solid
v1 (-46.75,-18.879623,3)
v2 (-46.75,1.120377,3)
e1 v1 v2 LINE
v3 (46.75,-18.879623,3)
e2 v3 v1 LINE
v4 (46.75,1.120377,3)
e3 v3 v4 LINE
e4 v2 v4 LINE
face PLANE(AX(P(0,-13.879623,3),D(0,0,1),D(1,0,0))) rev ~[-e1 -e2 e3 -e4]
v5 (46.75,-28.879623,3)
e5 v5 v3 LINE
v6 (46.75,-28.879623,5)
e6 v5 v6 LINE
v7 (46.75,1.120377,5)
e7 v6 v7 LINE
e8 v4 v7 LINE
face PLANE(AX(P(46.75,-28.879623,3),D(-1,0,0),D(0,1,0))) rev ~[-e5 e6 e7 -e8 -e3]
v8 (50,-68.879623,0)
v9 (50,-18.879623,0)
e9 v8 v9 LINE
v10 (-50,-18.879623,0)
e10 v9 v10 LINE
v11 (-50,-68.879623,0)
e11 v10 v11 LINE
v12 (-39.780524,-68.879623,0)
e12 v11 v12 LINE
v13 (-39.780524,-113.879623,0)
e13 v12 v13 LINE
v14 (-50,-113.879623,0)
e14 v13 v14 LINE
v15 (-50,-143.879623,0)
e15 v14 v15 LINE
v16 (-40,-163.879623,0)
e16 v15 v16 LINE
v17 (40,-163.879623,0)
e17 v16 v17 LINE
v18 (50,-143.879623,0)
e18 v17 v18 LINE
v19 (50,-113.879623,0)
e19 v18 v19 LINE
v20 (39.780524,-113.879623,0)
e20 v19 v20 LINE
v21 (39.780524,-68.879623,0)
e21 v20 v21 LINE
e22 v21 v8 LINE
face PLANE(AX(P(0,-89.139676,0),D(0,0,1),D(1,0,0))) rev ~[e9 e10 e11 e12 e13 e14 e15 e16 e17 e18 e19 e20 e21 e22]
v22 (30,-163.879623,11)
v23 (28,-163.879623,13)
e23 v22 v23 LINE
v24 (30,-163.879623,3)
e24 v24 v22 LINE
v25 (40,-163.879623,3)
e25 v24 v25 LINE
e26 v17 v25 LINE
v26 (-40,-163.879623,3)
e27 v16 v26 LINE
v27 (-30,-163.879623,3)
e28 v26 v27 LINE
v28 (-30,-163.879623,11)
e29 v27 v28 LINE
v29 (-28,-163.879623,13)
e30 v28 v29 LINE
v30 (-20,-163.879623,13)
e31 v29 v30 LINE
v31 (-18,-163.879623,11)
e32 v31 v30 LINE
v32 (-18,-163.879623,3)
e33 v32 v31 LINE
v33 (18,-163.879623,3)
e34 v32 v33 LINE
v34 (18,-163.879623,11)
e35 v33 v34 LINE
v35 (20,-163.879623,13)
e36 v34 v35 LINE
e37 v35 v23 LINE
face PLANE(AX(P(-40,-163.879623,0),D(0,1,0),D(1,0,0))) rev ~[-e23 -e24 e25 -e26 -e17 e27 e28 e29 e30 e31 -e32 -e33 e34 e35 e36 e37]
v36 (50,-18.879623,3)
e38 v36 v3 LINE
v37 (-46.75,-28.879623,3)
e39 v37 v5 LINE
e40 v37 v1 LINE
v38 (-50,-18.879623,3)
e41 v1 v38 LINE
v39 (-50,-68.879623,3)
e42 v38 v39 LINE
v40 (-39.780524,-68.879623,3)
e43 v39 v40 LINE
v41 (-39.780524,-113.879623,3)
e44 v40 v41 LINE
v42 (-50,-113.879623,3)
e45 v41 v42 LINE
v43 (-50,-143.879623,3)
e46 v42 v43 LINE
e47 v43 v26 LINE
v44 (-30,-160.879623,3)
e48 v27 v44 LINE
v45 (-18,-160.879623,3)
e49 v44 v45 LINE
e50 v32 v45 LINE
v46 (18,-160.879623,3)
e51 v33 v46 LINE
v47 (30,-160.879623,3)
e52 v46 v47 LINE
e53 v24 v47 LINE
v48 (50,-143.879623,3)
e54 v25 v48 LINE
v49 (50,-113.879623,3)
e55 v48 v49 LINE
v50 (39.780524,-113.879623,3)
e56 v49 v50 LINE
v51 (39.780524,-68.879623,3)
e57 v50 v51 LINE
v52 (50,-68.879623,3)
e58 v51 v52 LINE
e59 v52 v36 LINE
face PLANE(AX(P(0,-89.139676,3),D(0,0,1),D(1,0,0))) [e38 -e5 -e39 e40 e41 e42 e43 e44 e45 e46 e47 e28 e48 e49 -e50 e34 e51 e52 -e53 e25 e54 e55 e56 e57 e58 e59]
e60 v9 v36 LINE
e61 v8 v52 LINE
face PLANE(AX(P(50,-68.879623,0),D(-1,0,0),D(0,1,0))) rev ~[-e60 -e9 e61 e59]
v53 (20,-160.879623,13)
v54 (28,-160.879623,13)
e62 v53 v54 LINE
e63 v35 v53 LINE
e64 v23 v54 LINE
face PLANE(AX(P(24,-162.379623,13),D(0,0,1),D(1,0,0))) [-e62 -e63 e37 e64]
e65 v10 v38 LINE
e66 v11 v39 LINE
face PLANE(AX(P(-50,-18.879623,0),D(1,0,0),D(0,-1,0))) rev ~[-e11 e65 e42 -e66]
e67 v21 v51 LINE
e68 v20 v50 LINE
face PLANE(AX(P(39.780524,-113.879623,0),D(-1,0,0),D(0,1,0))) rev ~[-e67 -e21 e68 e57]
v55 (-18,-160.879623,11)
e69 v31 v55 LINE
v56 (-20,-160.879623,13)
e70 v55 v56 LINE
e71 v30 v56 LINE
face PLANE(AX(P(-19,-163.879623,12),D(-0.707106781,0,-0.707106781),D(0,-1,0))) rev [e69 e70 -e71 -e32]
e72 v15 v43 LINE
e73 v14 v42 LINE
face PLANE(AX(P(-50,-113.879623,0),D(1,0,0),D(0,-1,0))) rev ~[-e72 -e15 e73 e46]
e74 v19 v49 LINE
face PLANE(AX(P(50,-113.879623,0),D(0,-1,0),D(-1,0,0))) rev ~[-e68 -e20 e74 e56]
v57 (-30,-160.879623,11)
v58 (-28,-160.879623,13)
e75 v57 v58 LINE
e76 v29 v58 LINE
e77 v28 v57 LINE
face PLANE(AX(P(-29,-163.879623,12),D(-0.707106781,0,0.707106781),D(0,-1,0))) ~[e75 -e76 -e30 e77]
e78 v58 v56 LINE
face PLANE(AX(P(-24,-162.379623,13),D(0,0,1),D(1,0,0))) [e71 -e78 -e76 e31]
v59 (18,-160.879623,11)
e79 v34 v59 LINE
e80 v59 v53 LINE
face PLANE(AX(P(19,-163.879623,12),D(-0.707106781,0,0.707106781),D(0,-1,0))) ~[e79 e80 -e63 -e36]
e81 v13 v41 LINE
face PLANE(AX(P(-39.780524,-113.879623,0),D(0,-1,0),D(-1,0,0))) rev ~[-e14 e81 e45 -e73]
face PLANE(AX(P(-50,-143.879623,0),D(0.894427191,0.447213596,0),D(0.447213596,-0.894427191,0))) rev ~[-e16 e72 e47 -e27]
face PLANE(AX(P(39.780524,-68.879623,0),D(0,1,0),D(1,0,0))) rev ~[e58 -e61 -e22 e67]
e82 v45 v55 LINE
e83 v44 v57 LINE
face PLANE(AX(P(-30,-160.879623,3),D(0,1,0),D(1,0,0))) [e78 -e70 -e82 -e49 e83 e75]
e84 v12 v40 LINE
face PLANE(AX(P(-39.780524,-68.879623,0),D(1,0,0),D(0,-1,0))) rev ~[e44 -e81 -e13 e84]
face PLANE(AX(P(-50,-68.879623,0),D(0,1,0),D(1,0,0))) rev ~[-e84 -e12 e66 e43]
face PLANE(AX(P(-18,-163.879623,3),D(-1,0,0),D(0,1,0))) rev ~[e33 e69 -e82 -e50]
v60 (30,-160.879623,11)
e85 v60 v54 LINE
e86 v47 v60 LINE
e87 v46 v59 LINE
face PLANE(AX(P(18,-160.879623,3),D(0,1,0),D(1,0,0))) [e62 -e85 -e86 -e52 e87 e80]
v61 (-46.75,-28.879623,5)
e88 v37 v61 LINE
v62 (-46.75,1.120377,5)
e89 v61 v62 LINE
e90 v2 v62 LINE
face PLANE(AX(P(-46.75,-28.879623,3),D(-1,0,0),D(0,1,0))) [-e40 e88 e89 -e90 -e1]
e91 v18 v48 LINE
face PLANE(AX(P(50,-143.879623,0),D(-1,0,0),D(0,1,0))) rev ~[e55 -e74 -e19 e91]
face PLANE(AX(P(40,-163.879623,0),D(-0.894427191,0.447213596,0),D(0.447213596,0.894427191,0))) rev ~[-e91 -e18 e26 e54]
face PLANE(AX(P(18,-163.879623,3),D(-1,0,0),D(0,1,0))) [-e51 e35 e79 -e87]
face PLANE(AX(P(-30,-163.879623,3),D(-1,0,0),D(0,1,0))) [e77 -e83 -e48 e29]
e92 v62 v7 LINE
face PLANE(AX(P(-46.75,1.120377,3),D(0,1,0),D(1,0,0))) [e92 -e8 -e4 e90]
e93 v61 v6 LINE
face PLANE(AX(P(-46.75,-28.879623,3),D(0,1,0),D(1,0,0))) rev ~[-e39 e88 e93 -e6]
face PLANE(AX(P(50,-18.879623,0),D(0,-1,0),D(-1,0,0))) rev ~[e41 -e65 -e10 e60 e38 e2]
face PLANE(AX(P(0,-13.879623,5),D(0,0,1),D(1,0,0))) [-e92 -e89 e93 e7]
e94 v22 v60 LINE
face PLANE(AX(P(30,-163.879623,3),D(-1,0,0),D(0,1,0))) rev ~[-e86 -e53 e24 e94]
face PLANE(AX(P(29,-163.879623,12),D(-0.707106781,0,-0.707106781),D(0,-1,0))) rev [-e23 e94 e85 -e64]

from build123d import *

# Parameters (mm, degrees)
F1_DEPTH = 3
F2_W     = 12
F2_H     = 3
F3_DEPTH = 10
F4_SIZE  = 2
F5_W     = 93.5
F5_H     = 30
F6_DEPTH = 2


# Not quite as in the source:
# - a feature names something its author has since deleted; it is built from what else it names


with BuildPart() as f1:
    # F0 (on Top) → F1 (new body)
    with BuildSketch(Plane.XY):
        Polygon((50, -18.8796229661), (-50, -18.8796229661), (-50, -68.8796229661), (-39.780523628, -68.8796229661), (-39.780523628, -113.8796229661), (-50, -113.8796229661), (-50, -143.8796229661), (-40, -163.8796229661), (40, -163.8796229661), (50, -143.8796229661), (50, -113.8796229661), (39.780523628, -113.8796229661), (39.780523628, -68.8796229661), (50, -68.8796229661), align=None)
    extrude(amount=F1_DEPTH)

    # F2 (on face) → F3 (join)
    with BuildSketch(Plane.XY.offset(3)):
        with Locations((-24, -162.3796229661)):
            Rectangle(F2_W, F2_H)
        with Locations((24, -162.3796229661)):
            Rectangle(F2_W, F2_H)
    extrude(amount=F3_DEPTH)

    # F4
    f4_edges = [f1.edges().sort_by_distance(p)[0] for p in [
        (-18, -162.379623, 13),
        (-30, -162.379623, 13),
        (30, -162.379623, 13),
        (18, -162.379623, 13),
    ]]
    chamfer(f4_edges, length=F4_SIZE)

    # F5 (on face) → F6 (join)
    with BuildSketch(Plane.XY.offset(3)):
        with Locations((0, -13.8796229661)):
            Rectangle(F5_W, F5_H)
    extrude(amount=F6_DEPTH)


solid = f1.part
